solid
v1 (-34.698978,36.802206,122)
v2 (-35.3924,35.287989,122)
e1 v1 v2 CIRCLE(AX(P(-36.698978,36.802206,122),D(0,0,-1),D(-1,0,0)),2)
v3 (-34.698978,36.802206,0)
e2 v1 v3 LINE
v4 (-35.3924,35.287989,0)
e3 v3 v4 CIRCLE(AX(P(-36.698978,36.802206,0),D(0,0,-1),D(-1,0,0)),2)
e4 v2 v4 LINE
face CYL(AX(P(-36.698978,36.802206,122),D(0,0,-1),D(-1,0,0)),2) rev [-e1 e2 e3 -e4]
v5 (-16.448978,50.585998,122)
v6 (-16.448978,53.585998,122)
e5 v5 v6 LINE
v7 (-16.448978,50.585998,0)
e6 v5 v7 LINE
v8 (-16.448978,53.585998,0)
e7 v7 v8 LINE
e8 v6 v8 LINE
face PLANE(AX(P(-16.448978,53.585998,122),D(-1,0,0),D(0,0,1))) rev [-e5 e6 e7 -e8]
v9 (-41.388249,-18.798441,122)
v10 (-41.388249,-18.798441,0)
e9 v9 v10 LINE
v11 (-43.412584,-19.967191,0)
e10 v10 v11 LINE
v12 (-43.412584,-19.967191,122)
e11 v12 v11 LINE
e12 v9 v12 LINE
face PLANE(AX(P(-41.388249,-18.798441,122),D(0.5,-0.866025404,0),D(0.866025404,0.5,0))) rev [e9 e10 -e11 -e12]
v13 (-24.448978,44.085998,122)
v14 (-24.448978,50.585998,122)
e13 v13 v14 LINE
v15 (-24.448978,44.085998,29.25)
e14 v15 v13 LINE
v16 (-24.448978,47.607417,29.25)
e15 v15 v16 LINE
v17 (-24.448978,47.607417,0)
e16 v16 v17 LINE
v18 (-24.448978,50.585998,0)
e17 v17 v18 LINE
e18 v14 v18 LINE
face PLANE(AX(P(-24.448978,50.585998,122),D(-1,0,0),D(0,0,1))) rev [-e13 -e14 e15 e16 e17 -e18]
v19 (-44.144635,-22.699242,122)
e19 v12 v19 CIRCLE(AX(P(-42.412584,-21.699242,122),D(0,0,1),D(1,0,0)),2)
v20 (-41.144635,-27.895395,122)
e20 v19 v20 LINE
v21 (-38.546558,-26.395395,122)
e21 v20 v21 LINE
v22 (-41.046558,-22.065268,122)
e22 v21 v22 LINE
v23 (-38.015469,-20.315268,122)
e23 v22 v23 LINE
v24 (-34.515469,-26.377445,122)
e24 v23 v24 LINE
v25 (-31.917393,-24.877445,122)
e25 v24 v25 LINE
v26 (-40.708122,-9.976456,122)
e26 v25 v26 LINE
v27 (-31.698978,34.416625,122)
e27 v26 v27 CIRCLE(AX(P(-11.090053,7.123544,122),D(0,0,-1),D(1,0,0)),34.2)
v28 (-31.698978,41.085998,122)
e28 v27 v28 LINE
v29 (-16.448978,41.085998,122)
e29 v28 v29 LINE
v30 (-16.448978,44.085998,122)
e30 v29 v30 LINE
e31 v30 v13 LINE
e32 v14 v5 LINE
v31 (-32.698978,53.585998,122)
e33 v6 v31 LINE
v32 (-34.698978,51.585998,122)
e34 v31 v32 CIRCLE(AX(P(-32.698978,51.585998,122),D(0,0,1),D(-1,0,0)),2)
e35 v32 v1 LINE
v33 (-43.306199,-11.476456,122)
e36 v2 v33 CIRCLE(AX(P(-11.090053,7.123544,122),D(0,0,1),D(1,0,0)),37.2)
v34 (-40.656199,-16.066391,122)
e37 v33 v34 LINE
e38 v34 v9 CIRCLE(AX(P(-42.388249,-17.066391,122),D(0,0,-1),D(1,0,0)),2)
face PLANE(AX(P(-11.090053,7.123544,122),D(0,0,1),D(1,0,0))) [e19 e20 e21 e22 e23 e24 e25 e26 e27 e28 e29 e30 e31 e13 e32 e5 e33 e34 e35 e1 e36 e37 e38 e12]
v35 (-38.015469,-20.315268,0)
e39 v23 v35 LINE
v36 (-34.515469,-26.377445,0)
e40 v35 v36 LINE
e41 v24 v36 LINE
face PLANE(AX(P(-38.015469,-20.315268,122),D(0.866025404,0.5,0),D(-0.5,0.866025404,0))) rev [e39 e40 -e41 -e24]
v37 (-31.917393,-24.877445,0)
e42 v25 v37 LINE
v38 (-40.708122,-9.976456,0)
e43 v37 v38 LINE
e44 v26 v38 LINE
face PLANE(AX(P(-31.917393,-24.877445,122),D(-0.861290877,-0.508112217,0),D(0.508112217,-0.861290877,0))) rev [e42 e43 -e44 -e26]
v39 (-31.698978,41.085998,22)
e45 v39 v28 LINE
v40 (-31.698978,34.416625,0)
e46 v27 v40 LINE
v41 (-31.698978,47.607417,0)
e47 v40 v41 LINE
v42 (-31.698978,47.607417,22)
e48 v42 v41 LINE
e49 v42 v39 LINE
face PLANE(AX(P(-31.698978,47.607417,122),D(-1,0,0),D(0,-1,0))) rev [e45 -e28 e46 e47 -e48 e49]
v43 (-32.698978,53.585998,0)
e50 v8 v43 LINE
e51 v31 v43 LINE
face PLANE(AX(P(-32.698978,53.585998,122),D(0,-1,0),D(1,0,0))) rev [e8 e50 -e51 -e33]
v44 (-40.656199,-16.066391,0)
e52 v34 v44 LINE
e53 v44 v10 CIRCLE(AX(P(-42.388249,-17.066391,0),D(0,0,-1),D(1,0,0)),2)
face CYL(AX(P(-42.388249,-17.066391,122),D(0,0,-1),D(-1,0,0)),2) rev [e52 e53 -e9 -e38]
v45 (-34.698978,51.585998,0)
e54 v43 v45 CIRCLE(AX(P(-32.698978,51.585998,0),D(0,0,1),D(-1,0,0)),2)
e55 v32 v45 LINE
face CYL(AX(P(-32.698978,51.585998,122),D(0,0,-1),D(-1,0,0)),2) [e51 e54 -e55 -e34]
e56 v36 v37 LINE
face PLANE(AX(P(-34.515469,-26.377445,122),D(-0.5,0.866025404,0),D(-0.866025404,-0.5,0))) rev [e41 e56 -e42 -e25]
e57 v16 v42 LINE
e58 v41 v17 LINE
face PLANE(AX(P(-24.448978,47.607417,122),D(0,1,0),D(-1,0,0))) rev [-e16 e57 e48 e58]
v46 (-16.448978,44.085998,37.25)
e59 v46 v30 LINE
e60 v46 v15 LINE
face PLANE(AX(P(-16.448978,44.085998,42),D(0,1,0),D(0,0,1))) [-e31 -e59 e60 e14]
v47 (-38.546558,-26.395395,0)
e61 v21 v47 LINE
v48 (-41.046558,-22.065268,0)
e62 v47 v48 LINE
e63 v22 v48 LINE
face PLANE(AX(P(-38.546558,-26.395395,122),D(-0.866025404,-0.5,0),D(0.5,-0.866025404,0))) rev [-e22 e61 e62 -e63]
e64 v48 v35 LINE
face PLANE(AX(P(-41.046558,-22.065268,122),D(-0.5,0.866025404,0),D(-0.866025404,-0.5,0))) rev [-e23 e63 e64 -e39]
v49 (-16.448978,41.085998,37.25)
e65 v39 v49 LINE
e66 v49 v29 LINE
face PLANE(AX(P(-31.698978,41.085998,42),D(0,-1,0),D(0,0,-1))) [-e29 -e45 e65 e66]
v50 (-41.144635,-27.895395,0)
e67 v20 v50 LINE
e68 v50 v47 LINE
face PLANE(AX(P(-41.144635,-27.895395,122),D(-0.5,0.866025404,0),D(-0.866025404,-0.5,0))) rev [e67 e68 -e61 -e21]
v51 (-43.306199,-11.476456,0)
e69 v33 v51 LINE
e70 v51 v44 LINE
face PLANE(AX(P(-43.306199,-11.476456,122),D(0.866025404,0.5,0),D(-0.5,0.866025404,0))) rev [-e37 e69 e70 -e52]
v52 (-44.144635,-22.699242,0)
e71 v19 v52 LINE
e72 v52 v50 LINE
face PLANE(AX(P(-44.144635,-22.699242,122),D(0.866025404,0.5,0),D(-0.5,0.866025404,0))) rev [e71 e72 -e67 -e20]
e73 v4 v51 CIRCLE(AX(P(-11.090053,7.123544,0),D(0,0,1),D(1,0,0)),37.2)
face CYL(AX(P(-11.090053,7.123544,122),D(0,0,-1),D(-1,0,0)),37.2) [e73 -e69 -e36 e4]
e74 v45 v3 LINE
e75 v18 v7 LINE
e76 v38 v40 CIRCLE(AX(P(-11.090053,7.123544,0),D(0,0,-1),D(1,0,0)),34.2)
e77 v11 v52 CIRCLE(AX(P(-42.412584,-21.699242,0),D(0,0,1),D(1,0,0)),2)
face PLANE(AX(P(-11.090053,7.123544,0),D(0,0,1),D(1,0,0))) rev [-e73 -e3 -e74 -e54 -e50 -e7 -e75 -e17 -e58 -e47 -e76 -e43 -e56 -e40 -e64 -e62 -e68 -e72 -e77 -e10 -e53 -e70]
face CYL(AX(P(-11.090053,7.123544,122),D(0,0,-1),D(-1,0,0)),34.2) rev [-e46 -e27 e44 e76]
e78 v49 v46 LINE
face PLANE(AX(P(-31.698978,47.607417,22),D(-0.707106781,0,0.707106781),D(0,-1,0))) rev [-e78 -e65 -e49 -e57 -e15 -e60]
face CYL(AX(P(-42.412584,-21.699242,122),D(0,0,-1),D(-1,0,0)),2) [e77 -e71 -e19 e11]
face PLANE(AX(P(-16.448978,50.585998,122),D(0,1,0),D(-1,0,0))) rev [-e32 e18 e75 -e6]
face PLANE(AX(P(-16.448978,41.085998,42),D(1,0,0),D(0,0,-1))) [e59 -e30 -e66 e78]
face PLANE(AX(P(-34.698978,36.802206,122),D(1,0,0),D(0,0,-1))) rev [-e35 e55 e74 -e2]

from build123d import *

# Parameters (mm, degrees)
BOSS_EXTRUDE1_DEPTH = 122
BOSS_EXTRUDE2_DEPTH = 80
CHAMFER2_SIZE       = 20


with BuildPart() as part:
    # Sketch1 → Boss-Extrude1 (new body)
    with BuildSketch(Plane.XY):
        with BuildLine():
            Line((-24.448977817, 50.585997889), (-24.448977817, 47.607417283))
            Line((-24.448977817, 47.607417283), (-31.698977817, 47.607417283))
            Line((-31.698977817, 47.607417283), (-31.698977817, 34.416624517))
            ThreePointArc((-31.698977817, 34.416624517), (-44.606827003, 13.925447751), (-40.708122297, -9.976455887))
            Line((-40.708122297, -9.976455887), (-31.917393168, -24.877445372))
            Line((-31.917393168, -24.877445372), (-34.51546938, -26.377445372))
            Line((-34.51546938, -26.377445372), (-38.01546938, -20.315267546))
            Line((-38.01546938, -20.315267546), (-41.046558293, -22.065267546))
            Line((-41.046558293, -22.065267546), (-38.546558293, -26.395394565))
            Line((-38.546558293, -26.395394565), (-41.144634504, -27.895394565))
            Line((-41.144634504, -27.895394565), (-44.144634504, -22.699242142))
            ThreePointArc((-44.144634504, -22.699242142), (-44.344435349, -21.181604052), (-43.412583697, -19.967191335))
            Line((-43.412583697, -19.967191335), (-41.388249315, -18.798441335))
            ThreePointArc((-41.388249315, -18.798441335), (-40.456397663, -17.584028617), (-40.656198508, -16.066390527))
            Line((-40.656198508, -16.066390527), (-43.306198508, -11.476455887))
            ThreePointArc((-43.306198508, -11.476455887), (-47.768566234, 13.330532327), (-35.392400045, 35.287988929))
            ThreePointArc((-35.392400045, 35.287988929), (-34.880578034, 35.969486614), (-34.698977817, 36.802206392))
            Line((-34.698977817, 36.802206392), (-34.698977817, 51.585997889))
            ThreePointArc((-34.698977817, 51.585997889), (-34.113191379, 53.000211451), (-32.698977817, 53.585997889))
            Line((-32.698977817, 53.585997889), (-16.448977817, 53.585997889))
            Line((-16.448977817, 53.585997889), (-16.448977817, 50.585997889))
            Line((-16.448977817, 50.585997889), (-24.448977817, 50.585997889))
        make_face()
    extrude(amount=BOSS_EXTRUDE1_DEPTH)

    # Sketch3 → Boss-Extrude2 (add)
    with BuildSketch(Plane.XY.offset(122)):
        Polygon((-31.698977817, 41.085997889), (-16.448977817, 41.085997889), (-16.448977817, 44.085997889), (-24.448977817, 44.085997889), (-24.448977817, 47.607417283), (-31.698977817, 47.607417283), align=None)
    extrude(amount=-BOSS_EXTRUDE2_DEPTH)

    # Chamfer2
    # the kernel refuses this chamfer: 20 mm, written as the material it adds along each edge
    with BuildSketch(Plane(origin=(-31.698977817, 47.607417283, 42), x_dir=(-0.02749587661058649, 0, -0.9996219169112968), z_dir=(0, -1, 0))) as chamfer2_piece_1_section:
        Polygon((CHAMFER2_SIZE * 0.999621916911, CHAMFER2_SIZE * 0.0274958766106), (-CHAMFER2_SIZE * 0.0274958766106, CHAMFER2_SIZE * 0.999621916911), (0, 0), align=None)
    chamfer2_piece_1 = extrude(amount=6.521419395, mode=Mode.PRIVATE)
    chamfer2_piece_1 = split(chamfer2_piece_1, bisect_by=Plane(origin=(-24.448977817, 45.846707586, 33.55788947), z_dir=(-1, 0, 0)), keep=Keep.TOP, mode=Mode.PRIVATE)
    chamfer2_piece_1 = split(chamfer2_piece_1, bisect_by=Plane(origin=(-28.61775968, 44.085997889, 33.55788947), z_dir=(0, 1, 0)), keep=Keep.TOP, mode=Mode.PRIVATE)
    add(chamfer2_piece_1)
    with BuildSketch(Plane(origin=(-31.698977817, 47.607417283, 42), x_dir=(-0.02749587661058649, 0, -0.9996219169112968), z_dir=(0, -1, 0))) as chamfer2_piece_2_section:
        Polygon((CHAMFER2_SIZE * 0.999621916911, CHAMFER2_SIZE * 0.0274958766106), (-CHAMFER2_SIZE * 0.0274958766106, CHAMFER2_SIZE * 0.999621916911), (0, 0), align=None)
    chamfer2_piece_2 = extrude(amount=6.521419395, mode=Mode.PRIVATE)
    chamfer2_piece_2 = split(chamfer2_piece_2, bisect_by=Plane(origin=(-24.448977817, 42.585997889, 33.55788947), z_dir=(-1, 0, 0)), keep=Keep.TOP, mode=Mode.PRIVATE)
    chamfer2_piece_2 = split(chamfer2_piece_2, bisect_by=Plane(origin=(-28.61775968, 44.085997889, 33.55788947), z_dir=(0, -1, 0)), keep=Keep.TOP, mode=Mode.PRIVATE)
    add(chamfer2_piece_2)
    with BuildSketch(Plane(origin=(-31.698977817, 47.607417283, 42), x_dir=(-0.02749587661058649, 0, -0.9996219169112968), z_dir=(0, -1, 0))) as chamfer2_piece_3_section:
        Polygon((CHAMFER2_SIZE * 0.999621916911, CHAMFER2_SIZE * 0.0274958766106), (-CHAMFER2_SIZE * 0.0274958766106, CHAMFER2_SIZE * 0.999621916911), (0, 0), align=None)
    chamfer2_piece_3 = extrude(amount=6.521419395, mode=Mode.PRIVATE)
    chamfer2_piece_3 = split(chamfer2_piece_3, bisect_by=Plane(origin=(-24.448977817, 42.585997889, 37.556915733), z_dir=(1, 0, 0)), keep=Keep.TOP, mode=Mode.PRIVATE)
    chamfer2_piece_3 = split(chamfer2_piece_3, bisect_by=Plane(origin=(-16.448977817, 42.585997889, 37.556915733), z_dir=(-1, 0, 0)), keep=Keep.TOP, mode=Mode.PRIVATE)
    chamfer2_piece_3 = split(chamfer2_piece_3, bisect_by=Plane(origin=(-21.010172904, 44.085997889, 37.556915733), z_dir=(0, -1, 0)), keep=Keep.TOP, mode=Mode.PRIVATE)
    add(chamfer2_piece_3)


solid = part.part
